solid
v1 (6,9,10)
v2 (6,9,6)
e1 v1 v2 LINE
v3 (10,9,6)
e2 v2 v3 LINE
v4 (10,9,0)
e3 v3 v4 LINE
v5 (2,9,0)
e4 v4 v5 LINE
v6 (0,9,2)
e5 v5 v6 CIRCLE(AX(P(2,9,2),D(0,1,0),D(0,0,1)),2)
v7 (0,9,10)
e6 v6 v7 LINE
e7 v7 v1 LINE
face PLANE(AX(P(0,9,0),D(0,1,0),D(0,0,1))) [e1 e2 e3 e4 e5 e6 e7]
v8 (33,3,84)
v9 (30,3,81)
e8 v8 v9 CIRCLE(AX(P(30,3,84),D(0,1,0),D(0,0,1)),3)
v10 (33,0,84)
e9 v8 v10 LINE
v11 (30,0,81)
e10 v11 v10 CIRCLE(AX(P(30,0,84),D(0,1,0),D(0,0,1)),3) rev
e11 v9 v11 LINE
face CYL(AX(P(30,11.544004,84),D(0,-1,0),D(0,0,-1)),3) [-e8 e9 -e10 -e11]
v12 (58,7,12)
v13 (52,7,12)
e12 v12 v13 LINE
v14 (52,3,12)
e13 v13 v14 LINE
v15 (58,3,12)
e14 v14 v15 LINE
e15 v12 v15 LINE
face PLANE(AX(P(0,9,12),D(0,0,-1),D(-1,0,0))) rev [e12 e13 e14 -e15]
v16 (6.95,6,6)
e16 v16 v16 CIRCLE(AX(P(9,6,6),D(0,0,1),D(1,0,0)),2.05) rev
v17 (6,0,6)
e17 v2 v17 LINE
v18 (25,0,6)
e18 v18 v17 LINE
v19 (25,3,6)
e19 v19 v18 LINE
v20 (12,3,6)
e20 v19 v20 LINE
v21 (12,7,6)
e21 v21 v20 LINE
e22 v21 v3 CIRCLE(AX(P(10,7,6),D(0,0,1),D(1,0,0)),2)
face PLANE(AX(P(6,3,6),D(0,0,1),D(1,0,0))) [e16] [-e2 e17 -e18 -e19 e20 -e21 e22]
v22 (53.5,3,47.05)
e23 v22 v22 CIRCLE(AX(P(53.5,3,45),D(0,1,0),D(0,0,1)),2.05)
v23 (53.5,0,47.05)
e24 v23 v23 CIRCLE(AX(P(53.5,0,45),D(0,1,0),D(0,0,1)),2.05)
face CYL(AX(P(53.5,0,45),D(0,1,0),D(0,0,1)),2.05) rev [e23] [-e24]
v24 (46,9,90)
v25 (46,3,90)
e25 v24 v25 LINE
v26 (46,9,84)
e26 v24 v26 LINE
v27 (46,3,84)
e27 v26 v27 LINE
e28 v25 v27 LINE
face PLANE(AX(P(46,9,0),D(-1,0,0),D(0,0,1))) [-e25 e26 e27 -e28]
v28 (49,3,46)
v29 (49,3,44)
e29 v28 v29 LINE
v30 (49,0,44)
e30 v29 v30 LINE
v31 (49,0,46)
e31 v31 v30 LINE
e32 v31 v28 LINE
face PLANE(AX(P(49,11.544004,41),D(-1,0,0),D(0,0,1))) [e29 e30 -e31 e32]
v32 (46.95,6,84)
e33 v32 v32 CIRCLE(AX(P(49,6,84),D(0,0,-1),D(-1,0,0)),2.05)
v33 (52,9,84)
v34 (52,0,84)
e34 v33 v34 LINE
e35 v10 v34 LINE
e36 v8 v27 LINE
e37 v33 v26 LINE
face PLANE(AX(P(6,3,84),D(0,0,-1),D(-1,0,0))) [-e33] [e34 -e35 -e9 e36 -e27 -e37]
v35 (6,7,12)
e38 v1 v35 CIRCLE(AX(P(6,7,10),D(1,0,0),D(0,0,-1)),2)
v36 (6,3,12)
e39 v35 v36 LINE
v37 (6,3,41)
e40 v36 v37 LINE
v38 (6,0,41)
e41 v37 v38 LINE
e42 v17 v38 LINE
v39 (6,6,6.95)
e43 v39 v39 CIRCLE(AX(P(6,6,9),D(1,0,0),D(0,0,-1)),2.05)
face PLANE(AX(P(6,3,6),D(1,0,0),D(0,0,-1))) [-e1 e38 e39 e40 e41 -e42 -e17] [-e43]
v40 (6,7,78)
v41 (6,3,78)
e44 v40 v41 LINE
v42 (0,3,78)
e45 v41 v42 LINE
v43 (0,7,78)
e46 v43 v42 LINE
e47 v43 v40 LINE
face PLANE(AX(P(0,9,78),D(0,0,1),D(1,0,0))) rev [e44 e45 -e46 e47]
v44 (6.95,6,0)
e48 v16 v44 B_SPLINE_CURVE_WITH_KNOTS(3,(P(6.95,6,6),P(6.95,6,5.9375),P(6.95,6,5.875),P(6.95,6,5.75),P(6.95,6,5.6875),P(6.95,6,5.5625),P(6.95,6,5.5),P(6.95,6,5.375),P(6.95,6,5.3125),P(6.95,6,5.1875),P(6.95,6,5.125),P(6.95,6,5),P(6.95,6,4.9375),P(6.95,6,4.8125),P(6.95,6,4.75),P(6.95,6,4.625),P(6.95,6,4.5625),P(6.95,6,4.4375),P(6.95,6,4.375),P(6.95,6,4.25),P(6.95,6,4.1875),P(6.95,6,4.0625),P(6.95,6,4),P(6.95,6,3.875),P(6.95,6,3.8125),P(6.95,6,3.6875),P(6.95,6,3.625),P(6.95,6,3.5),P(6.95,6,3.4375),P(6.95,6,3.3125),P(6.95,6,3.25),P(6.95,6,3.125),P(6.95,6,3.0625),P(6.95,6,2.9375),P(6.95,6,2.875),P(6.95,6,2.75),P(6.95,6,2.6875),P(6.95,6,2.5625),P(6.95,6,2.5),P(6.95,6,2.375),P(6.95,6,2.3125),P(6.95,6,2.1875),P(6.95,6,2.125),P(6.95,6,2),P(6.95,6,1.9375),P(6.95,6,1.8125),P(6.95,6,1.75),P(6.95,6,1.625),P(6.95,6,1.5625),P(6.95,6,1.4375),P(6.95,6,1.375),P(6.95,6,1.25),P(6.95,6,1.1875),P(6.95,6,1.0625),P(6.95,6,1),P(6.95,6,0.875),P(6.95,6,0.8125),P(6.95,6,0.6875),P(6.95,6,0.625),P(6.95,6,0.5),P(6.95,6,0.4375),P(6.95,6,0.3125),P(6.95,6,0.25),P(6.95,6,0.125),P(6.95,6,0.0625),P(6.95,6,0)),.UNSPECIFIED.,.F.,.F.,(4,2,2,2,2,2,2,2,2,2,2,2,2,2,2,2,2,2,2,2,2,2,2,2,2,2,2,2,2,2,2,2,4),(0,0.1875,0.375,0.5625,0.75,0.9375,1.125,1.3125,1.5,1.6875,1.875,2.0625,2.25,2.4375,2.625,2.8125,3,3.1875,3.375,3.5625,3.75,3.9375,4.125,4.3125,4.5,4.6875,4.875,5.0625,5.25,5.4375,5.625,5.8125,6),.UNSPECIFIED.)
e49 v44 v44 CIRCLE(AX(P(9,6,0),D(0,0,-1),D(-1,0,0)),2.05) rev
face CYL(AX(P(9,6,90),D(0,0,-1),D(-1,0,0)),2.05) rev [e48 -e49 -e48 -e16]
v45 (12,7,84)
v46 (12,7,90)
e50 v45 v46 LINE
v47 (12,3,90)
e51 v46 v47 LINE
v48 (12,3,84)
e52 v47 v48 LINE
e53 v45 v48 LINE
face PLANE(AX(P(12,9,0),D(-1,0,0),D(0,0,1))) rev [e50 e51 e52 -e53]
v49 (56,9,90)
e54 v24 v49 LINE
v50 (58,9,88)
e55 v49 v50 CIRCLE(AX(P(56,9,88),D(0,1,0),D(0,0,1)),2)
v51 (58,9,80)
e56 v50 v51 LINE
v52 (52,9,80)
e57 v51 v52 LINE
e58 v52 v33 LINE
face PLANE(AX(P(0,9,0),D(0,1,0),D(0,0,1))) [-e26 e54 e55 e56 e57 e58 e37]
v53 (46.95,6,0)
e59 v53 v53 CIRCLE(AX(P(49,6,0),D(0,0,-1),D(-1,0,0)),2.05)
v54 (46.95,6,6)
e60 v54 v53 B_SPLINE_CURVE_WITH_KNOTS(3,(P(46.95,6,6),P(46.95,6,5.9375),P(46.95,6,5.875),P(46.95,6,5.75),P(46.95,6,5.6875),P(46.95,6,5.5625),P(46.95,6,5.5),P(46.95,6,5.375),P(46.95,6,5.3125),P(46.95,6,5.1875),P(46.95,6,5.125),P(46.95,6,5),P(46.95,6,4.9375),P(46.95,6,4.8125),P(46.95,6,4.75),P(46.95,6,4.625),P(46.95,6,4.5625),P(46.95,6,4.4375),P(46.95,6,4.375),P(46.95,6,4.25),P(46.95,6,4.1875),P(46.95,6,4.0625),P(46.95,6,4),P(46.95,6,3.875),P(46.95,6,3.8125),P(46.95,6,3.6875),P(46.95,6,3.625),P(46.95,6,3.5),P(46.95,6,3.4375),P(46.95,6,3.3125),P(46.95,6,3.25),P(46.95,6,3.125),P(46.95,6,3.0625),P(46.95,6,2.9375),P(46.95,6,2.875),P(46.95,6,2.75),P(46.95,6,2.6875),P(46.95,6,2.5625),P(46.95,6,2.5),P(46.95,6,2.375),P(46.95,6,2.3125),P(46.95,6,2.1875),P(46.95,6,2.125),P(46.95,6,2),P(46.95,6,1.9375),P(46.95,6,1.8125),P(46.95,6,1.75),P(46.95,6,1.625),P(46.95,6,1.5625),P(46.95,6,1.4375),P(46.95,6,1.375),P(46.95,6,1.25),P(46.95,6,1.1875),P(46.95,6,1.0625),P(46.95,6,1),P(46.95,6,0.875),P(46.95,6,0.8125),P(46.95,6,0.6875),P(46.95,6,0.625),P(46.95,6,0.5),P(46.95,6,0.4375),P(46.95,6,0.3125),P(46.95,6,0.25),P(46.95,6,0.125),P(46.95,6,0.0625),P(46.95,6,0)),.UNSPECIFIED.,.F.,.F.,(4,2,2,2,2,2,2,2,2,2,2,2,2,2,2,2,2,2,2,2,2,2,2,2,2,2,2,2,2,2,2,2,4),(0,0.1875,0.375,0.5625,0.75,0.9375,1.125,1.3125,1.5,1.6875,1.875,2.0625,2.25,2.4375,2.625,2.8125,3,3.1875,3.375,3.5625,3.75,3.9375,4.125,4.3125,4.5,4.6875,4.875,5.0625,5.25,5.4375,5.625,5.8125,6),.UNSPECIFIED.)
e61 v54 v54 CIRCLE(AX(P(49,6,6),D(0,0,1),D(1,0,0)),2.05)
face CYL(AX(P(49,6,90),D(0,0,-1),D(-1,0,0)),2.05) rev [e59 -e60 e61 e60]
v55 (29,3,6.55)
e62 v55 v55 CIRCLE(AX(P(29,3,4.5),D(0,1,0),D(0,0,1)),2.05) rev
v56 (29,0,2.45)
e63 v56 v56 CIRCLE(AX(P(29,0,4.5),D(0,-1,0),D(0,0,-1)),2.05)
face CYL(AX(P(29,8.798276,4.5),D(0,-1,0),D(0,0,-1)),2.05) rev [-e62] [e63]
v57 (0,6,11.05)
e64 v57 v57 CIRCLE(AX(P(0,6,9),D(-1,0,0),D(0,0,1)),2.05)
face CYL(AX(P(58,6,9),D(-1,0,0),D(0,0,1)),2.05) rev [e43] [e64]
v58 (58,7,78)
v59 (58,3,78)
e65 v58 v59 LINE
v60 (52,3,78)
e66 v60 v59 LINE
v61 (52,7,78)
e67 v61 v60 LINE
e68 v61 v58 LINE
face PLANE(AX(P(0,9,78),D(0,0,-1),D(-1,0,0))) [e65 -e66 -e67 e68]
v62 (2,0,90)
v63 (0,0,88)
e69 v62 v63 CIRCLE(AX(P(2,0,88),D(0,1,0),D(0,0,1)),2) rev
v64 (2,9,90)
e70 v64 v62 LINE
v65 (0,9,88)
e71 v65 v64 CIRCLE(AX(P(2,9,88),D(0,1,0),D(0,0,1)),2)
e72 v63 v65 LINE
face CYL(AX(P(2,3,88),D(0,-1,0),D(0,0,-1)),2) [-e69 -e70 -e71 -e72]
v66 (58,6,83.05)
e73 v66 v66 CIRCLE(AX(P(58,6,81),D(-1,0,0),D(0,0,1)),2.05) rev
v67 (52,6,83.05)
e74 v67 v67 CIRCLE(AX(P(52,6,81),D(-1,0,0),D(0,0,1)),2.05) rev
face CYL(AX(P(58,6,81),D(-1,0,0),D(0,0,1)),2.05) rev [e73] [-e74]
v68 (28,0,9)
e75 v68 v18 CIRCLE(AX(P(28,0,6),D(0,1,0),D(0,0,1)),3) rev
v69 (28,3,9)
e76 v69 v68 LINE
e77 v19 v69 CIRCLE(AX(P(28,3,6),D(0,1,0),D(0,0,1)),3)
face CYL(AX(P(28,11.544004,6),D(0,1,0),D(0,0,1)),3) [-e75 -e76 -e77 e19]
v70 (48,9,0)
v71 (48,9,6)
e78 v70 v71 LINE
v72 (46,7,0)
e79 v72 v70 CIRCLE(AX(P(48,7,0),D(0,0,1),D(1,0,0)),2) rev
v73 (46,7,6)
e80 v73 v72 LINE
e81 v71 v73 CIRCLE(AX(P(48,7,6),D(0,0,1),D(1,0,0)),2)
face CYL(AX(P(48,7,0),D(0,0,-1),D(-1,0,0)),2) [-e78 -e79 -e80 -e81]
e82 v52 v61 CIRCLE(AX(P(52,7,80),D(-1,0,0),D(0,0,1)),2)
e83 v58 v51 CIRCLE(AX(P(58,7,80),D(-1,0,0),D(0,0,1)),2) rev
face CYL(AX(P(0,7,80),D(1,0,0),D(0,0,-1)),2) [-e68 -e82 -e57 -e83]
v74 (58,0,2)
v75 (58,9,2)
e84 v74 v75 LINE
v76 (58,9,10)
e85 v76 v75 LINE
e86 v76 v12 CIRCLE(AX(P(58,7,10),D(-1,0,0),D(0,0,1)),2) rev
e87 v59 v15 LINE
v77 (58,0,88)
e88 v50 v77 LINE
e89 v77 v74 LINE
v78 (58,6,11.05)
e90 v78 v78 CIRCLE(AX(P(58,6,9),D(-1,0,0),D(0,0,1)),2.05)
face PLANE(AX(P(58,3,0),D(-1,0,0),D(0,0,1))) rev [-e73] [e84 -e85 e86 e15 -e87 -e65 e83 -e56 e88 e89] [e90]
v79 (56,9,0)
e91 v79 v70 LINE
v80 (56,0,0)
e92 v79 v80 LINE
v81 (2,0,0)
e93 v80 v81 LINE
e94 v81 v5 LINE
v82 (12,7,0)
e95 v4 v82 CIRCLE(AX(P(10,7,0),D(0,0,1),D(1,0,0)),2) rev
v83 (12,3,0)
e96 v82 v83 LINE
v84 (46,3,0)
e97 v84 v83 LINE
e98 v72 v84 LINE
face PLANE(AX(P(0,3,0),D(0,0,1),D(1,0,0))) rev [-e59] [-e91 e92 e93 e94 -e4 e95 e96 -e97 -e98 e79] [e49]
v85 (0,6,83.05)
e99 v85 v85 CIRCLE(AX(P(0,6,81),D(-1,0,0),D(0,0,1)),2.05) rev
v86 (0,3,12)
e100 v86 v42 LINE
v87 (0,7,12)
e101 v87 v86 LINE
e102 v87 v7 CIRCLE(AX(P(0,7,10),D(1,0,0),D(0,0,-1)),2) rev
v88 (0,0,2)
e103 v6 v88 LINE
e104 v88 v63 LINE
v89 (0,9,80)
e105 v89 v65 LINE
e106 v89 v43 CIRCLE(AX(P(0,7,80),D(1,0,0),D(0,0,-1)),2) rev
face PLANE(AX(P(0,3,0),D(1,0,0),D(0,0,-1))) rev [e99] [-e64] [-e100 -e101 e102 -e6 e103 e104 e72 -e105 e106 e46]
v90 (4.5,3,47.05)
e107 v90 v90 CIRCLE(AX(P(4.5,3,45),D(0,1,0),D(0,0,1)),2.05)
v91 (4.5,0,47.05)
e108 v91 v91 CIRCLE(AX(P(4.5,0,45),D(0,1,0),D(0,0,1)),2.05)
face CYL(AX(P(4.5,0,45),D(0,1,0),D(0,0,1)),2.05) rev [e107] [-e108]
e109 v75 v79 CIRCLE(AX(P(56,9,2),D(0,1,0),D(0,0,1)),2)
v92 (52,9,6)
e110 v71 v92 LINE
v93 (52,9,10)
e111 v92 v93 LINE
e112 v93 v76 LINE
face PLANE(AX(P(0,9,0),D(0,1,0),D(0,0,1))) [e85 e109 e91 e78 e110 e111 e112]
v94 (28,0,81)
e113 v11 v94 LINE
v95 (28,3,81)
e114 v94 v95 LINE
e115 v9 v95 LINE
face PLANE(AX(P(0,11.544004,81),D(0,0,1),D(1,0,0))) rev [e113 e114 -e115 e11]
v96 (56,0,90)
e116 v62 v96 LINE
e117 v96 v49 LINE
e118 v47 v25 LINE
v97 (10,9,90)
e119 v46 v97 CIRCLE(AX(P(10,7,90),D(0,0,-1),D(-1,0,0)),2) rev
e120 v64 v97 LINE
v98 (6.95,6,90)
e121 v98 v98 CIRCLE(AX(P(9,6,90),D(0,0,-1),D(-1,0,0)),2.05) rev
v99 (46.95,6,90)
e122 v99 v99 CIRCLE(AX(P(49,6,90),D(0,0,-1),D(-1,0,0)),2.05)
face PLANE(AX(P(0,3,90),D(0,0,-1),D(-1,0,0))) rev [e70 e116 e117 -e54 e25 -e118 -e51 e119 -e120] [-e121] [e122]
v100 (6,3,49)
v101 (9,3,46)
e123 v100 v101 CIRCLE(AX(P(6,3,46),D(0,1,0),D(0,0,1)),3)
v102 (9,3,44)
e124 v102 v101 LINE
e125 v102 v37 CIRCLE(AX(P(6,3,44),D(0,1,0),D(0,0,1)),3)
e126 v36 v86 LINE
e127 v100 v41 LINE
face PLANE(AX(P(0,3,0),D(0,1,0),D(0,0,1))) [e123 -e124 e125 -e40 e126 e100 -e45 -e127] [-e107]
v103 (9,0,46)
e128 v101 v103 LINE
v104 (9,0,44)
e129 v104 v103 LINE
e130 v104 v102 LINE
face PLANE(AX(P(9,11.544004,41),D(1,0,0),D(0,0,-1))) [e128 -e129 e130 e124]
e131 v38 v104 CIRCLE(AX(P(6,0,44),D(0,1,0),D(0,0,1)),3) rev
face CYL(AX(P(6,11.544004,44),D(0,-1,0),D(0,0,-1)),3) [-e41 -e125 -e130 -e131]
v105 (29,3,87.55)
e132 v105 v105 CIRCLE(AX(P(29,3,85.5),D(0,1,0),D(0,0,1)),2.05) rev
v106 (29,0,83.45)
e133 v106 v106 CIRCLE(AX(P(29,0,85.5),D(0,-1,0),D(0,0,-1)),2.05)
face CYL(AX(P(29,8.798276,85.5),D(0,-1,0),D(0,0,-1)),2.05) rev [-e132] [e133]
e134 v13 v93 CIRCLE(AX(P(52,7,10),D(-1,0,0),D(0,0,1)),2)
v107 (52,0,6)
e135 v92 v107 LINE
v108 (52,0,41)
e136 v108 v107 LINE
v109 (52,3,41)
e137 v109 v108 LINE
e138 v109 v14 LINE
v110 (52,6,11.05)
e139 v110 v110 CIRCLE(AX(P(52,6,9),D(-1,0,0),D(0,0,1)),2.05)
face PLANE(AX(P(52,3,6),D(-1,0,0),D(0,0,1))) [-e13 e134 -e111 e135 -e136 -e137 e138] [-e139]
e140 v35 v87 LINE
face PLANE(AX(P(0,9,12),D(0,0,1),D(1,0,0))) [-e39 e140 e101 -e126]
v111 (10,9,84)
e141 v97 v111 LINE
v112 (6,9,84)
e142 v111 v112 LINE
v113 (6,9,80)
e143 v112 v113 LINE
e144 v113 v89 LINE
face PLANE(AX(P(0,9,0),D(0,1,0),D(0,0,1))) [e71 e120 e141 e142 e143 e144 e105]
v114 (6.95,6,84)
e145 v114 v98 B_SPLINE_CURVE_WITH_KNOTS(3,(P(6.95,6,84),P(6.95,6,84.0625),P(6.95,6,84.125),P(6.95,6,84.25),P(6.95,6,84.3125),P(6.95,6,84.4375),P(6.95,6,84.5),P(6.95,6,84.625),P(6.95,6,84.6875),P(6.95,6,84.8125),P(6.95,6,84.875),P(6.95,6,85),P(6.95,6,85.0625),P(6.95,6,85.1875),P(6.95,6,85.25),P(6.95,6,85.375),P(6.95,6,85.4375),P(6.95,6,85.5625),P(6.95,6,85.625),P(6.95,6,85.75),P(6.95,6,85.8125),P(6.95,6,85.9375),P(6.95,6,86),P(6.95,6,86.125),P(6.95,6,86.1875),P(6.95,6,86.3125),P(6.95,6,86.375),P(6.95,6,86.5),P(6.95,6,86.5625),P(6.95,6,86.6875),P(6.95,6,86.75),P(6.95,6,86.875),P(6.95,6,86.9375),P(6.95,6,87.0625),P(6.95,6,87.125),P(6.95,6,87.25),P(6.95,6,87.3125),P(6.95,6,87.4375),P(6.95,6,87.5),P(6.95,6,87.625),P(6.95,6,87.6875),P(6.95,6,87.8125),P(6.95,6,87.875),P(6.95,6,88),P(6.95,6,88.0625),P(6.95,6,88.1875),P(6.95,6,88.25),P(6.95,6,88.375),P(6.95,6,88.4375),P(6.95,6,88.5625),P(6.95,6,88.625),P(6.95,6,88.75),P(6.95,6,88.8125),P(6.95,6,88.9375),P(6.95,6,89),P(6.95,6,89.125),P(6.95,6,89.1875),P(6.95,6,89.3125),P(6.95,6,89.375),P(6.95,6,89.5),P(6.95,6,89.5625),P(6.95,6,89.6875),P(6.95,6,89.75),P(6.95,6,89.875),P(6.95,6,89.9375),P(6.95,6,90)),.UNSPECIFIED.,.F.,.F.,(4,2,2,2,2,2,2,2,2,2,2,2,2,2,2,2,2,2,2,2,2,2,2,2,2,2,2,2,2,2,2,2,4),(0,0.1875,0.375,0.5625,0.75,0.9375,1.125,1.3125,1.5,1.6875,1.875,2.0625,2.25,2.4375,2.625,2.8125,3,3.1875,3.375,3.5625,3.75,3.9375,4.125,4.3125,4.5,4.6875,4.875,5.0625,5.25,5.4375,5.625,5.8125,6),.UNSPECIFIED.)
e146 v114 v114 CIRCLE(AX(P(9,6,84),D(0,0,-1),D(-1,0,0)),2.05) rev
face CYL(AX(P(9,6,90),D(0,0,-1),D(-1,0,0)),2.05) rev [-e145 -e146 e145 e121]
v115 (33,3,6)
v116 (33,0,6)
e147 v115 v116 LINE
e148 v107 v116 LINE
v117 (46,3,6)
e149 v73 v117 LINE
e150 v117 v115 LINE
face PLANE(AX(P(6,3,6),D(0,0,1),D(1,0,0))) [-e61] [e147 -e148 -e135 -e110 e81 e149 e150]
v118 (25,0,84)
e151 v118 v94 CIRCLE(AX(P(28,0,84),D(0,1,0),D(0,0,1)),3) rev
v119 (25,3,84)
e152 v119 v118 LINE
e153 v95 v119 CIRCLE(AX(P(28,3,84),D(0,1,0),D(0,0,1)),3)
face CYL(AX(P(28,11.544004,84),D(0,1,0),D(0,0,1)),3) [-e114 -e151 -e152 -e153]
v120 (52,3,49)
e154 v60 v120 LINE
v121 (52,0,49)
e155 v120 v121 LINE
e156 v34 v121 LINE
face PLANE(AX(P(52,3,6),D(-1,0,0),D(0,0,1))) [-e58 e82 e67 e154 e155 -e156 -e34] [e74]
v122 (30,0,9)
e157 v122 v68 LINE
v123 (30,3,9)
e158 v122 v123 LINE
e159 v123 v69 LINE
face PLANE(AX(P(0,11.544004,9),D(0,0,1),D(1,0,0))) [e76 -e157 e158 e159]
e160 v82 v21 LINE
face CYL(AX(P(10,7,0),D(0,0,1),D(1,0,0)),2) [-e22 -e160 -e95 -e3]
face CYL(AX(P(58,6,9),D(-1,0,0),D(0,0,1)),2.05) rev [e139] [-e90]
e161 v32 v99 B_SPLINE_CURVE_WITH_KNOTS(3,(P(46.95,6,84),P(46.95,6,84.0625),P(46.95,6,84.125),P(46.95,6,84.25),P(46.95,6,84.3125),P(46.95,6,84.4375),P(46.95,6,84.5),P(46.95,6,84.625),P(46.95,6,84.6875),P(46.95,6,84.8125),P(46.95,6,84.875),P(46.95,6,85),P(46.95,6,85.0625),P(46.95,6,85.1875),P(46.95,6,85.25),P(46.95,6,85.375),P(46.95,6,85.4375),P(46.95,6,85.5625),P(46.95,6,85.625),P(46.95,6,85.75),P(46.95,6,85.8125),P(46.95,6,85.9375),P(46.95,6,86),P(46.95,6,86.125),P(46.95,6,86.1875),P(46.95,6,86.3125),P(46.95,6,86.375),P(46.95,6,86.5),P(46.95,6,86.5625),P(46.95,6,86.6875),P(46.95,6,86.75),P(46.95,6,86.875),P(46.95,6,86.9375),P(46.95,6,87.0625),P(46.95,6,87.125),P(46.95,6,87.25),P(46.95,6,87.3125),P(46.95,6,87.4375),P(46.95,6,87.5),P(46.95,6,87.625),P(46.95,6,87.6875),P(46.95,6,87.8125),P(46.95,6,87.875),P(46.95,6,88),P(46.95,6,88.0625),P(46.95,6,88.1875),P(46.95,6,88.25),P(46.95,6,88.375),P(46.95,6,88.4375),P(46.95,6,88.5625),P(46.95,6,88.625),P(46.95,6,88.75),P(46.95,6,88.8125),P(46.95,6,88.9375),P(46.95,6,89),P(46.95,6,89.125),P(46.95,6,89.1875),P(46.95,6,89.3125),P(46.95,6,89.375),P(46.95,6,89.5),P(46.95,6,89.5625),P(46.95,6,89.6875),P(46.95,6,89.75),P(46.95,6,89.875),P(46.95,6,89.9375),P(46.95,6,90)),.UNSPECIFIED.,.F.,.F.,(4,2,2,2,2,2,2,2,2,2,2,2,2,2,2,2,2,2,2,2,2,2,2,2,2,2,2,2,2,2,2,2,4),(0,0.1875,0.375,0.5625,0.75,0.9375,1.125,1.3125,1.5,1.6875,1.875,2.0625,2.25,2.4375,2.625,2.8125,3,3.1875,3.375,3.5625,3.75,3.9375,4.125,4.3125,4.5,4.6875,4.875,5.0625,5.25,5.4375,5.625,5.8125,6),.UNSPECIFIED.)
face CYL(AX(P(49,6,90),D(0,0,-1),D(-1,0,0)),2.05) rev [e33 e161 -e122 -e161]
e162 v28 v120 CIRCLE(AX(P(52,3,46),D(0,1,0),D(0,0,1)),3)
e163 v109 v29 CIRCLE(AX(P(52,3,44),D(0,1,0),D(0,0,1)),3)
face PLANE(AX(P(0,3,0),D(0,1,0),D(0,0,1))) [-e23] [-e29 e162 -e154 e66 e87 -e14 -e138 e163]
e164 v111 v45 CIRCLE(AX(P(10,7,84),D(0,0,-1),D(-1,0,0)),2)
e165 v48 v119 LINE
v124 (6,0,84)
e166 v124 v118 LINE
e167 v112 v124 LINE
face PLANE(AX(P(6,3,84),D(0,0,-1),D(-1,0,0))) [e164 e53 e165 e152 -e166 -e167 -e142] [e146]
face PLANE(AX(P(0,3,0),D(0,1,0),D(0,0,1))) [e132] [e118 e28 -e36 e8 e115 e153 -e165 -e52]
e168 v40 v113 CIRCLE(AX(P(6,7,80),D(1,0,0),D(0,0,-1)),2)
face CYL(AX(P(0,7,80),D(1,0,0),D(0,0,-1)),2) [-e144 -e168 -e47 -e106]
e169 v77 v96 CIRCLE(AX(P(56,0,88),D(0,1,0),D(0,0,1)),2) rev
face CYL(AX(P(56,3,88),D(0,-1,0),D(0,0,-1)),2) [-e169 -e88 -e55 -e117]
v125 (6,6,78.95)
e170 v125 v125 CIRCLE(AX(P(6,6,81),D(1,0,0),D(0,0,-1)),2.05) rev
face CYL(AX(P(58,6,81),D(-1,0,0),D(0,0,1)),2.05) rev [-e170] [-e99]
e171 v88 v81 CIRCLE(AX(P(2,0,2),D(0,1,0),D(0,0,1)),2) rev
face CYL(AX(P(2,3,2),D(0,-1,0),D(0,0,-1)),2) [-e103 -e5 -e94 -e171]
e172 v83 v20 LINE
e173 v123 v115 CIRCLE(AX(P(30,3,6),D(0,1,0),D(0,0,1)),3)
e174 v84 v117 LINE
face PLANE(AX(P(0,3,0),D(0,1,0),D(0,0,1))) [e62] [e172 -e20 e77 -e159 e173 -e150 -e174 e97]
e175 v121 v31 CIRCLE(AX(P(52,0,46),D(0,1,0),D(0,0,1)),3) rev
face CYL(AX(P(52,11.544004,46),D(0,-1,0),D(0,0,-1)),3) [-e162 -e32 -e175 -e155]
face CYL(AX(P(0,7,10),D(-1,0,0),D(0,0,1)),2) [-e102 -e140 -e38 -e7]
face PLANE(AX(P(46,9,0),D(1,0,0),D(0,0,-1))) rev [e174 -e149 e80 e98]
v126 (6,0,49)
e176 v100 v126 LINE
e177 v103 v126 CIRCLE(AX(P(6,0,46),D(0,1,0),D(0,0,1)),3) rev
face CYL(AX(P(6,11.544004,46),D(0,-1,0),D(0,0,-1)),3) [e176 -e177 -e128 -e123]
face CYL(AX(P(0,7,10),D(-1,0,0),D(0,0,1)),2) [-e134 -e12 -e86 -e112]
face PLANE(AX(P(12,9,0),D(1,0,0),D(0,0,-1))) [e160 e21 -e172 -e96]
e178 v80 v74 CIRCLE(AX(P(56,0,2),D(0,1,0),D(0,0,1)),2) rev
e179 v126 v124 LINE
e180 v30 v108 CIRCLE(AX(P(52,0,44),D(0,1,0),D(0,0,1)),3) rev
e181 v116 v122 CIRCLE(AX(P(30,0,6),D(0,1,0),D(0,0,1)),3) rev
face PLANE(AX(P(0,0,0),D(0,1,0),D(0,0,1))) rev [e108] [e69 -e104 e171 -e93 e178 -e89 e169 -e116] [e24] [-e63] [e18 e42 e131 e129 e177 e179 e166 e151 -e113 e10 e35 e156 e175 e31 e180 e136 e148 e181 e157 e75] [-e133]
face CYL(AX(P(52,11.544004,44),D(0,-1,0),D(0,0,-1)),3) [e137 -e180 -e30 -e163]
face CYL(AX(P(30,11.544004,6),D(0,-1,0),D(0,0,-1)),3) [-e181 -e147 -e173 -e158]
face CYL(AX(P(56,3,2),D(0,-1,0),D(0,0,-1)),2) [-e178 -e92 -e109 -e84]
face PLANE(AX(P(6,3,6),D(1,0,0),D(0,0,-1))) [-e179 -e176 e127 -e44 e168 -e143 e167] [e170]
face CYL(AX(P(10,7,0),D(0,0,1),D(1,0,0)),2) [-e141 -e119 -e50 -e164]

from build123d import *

# Parameters (mm, degrees)
SKETCH1_W           = 58
SKETCH1_H           = 90
SKETCH1_W_2         = 46
SKETCH1_H_2         = 78
BOSS_EXTRUDE1_DEPTH = 3
BOSS_EXTRUDE2_DEPTH = 6
SKETCH3_R           = 2.05
CUT_EXTRUDE1_DEPTH  = 108.447661678
SKETCH4_R           = 2.05
CUT_EXTRUDE2_DEPTH  = 108.447661678
FILLET1_R           = 2
FILLET2_R           = 2
SKETCH5_W           = 8
SKETCH5_H           = 3
BOSS_EXTRUDE3_DEPTH = 3
SKETCH6_R           = 2.05
CUT_EXTRUDE3_DEPTH  = 3
FILLET3_R           = 3
SKETCH7_W           = 3
SKETCH7_H           = 8
BOSS_EXTRUDE4_DEPTH = 3
SKETCH8_R           = 2.05
CUT_EXTRUDE4_DEPTH  = 108.238052948
FILLET4_R           = 3


with BuildPart() as part:
    # Sketch1 → Boss-Extrude1 (new body)
    with BuildSketch(Plane(origin=(0, 0, 0), x_dir=(1, 0, 0), z_dir=(0, 1, 0))):
        with Locations((29, -45)):
            Rectangle(SKETCH1_W, SKETCH1_H)
        with Locations((29, -45)):
            Rectangle(SKETCH1_W_2, SKETCH1_H_2, mode=Mode.SUBTRACT)
    extrude(amount=BOSS_EXTRUDE1_DEPTH)

    # Sketch2 → Boss-Extrude2 (add)
    with BuildSketch(Plane(origin=(0, 3, 0), x_dir=(1, 0, 0), z_dir=(0, 1, 0))):
        Polygon((46, -84), (46, -90), (58, -90), (58, -78), (52, -78), (52, -84), align=None)
        Polygon((52, -12), (58, -12), (58, 0), (46, 0), (46, -6), (52, -6), align=None)
        Polygon((0, 0), (0, -12), (6, -12), (6, -6), (12, -6), (12, 0), align=None)
        Polygon((0, -90), (12, -90), (12, -84), (6, -84), (6, -78), (0, -78), align=None)
    extrude(amount=BOSS_EXTRUDE2_DEPTH)

    # Sketch3 → Cut-Extrude1 (cut, through all)
    with BuildSketch(Plane.ZY):
        with Locations((9, 6)):
            Circle(SKETCH3_R)
        with Locations((81, 6)):
            Circle(SKETCH3_R)
    extrude(amount=-CUT_EXTRUDE1_DEPTH, mode=Mode.SUBTRACT)

    # Sketch4 → Cut-Extrude2 (cut, through all)
    with BuildSketch(Plane(origin=(0, 0, 0), x_dir=(-1, 0, 0), z_dir=(0, 0, -1))):
        with Locations((-49, 6)):
            Circle(SKETCH4_R)
        with Locations((-9, 6)):
            Circle(SKETCH4_R)
    extrude(amount=-CUT_EXTRUDE2_DEPTH, mode=Mode.SUBTRACT)

    # Fillet1
    fillet1_edges = [part.edges().sort_by_distance(p)[0] for p in [
        (55, 9, 78),
        (55, 9, 12),
        (46, 9, 3),
        (3, 9, 12),
        (12, 9, 3),
        (3, 9, 78),
        (12, 9, 87),
    ]]
    fillet(fillet1_edges, radius=FILLET1_R)

    # Fillet2
    fillet2_edges = [part.edges().sort_by_distance(p)[0] for p in [
        (0, 4.5, 0),
        (58, 4.5, 0),
        (58, 4.5, 90),
        (0, 4.5, 90),
    ]]
    fillet(fillet2_edges, radius=FILLET2_R)

    # Sketch5 → Boss-Extrude3 (add)
    with BuildSketch(Plane.XZ):
        with Locations((29, 7.5)):
            Rectangle(SKETCH5_W, SKETCH5_H)
        with Locations((29, 82.5)):
            Rectangle(SKETCH5_W, SKETCH5_H)
    extrude(amount=-BOSS_EXTRUDE3_DEPTH)

    # Sketch6 → Cut-Extrude3 (cut)
    with BuildSketch(Plane.XZ):
        with Locations(Location((29, 85.5, 0), (0, 0, 270))):
            Circle(SKETCH6_R)
        with Locations(Location((29, 4.5, 0), (0, 0, 270))):
            Circle(SKETCH6_R)
    extrude(amount=-CUT_EXTRUDE3_DEPTH, mode=Mode.SUBTRACT)

    # Fillet3
    fillet3_edges = [part.edges().sort_by_distance(p)[0] for p in [
        (33, 1.5, 81),
        (25, 1.5, 81),
        (33, 1.5, 9),
        (25, 1.5, 9),
    ]]
    fillet(fillet3_edges, radius=FILLET3_R - 0.0001)  # a hair under: the kernel refuses the full size

    # Sketch7 → Boss-Extrude4 (add)
    with BuildSketch(Plane.XZ):
        with Locations((50.5, 45)):
            Rectangle(SKETCH7_W, SKETCH7_H)
        with Locations((7.5, 45)):
            Rectangle(SKETCH7_W, SKETCH7_H)
    extrude(amount=-BOSS_EXTRUDE4_DEPTH)

    # Sketch8 → Cut-Extrude4 (cut, through all)
    with BuildSketch(Plane(origin=(0, 3, 0), x_dir=(1, 0, 0), z_dir=(0, 1, 0))):
        with Locations(Location((4.5, -45, 0), (0, 0, 270))):
            Circle(SKETCH8_R)
        with Locations(Location((53.5, -45, 0), (0, 0, 270))):
            Circle(SKETCH8_R)
    extrude(amount=-CUT_EXTRUDE4_DEPTH, mode=Mode.SUBTRACT)

    # Fillet4
    fillet4_edges = [part.edges().sort_by_distance(p)[0] for p in [
        (49, 1.5, 41),
        (49, 1.5, 49),
        (9, 1.5, 41),
        (9, 1.5, 49),
    ]]
    fillet(fillet4_edges, radius=FILLET4_R - 0.0001)  # a hair under: the kernel refuses the full size


solid = part.part
